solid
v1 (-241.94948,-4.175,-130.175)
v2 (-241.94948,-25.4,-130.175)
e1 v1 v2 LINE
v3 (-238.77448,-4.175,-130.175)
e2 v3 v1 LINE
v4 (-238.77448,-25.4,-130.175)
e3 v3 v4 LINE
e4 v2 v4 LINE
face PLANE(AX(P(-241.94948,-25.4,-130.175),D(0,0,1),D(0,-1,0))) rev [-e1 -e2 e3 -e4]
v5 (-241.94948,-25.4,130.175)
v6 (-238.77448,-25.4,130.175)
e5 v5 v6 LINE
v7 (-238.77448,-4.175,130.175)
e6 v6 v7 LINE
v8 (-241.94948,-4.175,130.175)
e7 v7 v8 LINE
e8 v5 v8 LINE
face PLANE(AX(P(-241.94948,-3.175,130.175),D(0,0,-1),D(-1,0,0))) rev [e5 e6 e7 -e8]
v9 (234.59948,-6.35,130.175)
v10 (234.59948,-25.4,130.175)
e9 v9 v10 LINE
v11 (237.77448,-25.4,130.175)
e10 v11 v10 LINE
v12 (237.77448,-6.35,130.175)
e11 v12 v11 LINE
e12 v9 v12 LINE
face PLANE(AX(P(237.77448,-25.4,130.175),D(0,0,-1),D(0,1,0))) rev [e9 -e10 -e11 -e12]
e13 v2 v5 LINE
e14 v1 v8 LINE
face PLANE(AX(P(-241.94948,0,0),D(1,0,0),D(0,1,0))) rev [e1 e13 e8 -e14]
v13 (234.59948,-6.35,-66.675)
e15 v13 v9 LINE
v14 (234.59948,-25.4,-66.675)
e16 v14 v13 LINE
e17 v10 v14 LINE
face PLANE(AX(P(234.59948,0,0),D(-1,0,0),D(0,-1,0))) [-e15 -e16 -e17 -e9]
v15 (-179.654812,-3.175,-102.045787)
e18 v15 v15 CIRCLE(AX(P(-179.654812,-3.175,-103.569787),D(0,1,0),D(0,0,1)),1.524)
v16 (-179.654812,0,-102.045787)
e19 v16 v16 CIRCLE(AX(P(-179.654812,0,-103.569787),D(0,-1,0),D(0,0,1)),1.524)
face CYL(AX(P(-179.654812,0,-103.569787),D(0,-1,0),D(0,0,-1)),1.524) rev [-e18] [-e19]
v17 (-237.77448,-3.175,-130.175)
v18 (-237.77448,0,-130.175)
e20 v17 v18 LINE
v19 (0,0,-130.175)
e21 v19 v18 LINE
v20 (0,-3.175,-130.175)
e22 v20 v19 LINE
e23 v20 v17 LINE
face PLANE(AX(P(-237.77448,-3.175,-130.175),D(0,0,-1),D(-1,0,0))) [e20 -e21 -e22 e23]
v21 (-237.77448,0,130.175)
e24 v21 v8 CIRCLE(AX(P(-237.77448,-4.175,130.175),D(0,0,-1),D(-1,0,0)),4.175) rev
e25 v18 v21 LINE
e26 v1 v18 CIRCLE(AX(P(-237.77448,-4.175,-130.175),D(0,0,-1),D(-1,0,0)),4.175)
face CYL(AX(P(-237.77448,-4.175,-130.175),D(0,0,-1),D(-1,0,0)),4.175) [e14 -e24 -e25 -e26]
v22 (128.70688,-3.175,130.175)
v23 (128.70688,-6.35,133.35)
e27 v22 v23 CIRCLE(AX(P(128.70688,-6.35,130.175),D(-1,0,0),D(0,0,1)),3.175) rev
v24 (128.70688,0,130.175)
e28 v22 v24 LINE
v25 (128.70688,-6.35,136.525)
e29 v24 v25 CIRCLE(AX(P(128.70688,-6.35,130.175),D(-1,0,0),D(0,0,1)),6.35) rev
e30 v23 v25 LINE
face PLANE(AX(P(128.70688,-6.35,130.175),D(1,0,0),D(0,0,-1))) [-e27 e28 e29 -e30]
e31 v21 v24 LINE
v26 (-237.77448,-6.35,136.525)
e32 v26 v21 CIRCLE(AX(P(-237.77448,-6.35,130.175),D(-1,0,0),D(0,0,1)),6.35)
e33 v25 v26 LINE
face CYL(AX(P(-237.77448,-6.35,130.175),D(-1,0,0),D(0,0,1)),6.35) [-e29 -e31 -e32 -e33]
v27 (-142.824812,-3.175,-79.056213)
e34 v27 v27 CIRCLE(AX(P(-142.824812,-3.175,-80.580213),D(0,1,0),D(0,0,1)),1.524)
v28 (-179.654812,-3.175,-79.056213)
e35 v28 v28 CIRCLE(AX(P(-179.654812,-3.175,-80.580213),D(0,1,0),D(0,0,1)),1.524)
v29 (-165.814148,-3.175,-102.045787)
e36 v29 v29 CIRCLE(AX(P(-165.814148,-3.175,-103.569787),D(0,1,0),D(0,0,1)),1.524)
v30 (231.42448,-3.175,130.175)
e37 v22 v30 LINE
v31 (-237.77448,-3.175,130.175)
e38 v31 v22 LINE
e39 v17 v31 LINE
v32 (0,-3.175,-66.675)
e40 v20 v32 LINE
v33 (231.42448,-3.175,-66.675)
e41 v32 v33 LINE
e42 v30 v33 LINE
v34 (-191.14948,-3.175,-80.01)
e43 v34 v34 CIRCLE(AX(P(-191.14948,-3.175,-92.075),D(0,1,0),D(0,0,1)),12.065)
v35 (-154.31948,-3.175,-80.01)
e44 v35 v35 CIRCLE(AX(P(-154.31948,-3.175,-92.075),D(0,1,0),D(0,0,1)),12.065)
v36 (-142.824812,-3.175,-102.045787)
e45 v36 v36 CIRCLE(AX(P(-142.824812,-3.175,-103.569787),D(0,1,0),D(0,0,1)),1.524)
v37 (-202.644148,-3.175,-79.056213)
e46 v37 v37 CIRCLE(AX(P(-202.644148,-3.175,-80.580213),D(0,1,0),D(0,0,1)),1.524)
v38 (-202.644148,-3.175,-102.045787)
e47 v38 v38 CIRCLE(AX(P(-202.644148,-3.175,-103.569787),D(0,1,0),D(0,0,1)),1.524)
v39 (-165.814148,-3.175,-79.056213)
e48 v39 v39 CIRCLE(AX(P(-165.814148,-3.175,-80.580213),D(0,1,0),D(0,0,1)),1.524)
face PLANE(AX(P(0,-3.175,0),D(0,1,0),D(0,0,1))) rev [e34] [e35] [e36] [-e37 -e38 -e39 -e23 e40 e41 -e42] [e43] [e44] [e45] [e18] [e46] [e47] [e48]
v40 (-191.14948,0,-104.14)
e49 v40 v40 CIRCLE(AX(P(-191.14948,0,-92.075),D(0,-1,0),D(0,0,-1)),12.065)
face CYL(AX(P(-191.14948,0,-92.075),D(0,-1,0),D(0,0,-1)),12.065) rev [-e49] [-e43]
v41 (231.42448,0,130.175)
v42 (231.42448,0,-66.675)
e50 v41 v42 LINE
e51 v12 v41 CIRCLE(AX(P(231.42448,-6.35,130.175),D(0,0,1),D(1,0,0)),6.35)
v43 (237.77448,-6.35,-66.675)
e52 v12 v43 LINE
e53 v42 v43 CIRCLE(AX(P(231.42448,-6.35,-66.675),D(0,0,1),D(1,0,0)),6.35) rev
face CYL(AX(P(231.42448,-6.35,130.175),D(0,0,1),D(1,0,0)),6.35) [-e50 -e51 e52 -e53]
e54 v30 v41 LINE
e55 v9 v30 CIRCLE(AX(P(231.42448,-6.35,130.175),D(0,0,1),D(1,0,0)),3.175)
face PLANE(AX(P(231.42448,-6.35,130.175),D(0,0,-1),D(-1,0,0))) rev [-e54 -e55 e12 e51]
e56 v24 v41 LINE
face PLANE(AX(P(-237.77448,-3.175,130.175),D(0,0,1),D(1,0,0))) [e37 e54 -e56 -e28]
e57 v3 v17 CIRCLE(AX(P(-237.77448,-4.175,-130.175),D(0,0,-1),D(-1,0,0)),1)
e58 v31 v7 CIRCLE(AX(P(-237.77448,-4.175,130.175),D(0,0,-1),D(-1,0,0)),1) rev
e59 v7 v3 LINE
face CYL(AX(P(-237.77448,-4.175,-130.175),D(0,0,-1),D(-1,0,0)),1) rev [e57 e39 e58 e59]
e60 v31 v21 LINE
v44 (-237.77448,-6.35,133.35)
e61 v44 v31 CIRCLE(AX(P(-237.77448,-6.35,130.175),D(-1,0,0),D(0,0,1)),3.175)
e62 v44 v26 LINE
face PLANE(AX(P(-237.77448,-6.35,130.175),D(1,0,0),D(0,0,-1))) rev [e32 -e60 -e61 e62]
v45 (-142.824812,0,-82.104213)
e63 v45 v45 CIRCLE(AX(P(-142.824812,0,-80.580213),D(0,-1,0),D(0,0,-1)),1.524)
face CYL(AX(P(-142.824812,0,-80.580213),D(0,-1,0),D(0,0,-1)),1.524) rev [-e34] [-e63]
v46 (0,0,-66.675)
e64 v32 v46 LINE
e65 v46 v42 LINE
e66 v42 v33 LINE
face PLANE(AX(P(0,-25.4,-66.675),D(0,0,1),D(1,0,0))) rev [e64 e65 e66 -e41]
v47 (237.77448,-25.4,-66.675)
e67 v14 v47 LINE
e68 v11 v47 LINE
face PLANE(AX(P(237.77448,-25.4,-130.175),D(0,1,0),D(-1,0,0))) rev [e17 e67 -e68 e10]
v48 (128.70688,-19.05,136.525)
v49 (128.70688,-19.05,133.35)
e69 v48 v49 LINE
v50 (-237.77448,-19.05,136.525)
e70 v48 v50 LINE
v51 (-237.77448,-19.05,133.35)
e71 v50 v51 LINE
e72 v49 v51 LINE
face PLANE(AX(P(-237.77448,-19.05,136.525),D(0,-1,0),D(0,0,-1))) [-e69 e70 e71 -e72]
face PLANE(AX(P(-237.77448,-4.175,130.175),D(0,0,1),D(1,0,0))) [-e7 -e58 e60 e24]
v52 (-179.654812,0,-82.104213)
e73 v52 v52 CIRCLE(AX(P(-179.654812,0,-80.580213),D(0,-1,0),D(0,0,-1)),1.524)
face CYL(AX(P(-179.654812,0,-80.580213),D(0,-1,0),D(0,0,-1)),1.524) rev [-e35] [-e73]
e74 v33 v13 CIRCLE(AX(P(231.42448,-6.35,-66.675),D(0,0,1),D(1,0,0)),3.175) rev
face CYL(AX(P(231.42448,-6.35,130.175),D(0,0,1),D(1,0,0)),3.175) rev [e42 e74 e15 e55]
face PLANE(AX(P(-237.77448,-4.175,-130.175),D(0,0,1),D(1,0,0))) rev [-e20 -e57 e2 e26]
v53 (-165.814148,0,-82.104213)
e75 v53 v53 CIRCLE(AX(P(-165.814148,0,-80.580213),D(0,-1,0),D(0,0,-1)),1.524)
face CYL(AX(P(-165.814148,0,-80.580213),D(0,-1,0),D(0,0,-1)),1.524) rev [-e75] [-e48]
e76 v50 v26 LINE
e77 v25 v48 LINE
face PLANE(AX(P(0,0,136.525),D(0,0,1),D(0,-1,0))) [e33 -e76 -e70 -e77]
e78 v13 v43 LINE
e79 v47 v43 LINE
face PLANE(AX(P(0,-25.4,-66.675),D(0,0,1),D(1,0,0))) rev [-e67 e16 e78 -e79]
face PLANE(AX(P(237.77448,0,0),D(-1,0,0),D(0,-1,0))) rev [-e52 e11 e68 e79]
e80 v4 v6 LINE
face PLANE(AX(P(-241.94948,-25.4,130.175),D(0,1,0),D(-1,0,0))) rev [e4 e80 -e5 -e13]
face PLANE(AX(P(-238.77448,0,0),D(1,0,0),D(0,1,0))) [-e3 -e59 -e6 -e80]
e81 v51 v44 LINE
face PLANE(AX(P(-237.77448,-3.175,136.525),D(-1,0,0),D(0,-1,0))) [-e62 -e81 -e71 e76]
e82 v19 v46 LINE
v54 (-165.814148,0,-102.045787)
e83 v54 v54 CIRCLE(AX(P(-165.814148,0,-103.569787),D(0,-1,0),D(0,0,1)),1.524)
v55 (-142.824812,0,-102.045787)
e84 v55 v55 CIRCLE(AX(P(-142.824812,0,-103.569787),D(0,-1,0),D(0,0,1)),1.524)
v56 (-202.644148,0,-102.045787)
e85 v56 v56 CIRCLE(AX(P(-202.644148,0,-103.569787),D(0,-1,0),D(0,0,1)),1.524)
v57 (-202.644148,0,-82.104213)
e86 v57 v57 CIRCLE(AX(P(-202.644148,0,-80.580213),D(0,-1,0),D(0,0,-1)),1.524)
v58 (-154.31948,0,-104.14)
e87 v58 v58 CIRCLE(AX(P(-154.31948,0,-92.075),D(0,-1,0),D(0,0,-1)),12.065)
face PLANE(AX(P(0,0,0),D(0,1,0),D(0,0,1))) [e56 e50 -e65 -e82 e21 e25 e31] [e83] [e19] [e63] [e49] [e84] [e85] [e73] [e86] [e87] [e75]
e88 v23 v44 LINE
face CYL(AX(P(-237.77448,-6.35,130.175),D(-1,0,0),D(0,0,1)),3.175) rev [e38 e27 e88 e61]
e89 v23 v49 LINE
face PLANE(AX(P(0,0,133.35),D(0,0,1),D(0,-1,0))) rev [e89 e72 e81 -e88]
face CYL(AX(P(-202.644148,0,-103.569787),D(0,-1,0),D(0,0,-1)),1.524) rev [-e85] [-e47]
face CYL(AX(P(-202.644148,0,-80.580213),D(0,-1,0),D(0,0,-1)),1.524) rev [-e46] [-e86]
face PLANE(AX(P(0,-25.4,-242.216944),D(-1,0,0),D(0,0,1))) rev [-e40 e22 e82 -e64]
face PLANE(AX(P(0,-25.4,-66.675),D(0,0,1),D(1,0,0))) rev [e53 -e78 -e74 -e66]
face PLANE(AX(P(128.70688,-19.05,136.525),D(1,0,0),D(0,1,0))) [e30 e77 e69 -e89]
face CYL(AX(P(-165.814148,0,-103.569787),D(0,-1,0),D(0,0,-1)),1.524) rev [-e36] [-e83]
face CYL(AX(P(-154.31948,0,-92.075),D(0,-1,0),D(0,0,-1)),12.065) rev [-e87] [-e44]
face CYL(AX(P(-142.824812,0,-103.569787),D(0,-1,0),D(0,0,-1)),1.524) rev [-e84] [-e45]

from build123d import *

# Parameters (mm, degrees)
SKETCH5_W                    = 475.54896
SKETCH5_H                    = 260.35
BASE_FLANGE1_DEPTH           = 3.175
EDGE_FLANGE1_DEPTH           = 366.48136
EDGE_FLANGE2_STRIP_W         = 19.05
EDGE_FLANGE2_STRIP_H         = 3.175
EDGE_FLANGE2_STRIP_CUT_DEPTH = 260.35
EDGE_FLANGE2_DEPTH           = 260.35
EDGE_FLANGE3_DEPTH           = 260.35
CUT_EXTRUDE1_DEPTH           = 279.969149723
CUT_EXTRUDE1_DEPTH_BACK      = 279.969149723
SKETCH15_W                   = 329.647515686
SKETCH15_H                   = 175.541944057
CUT_EXTRUDE2_DEPTH           = 279.698003441
CUT_EXTRUDE2_DEPTH_BACK      = 279.698003441
SKETCH16_R                   = 12.065
SKETCH16_R_2                 = 1.524


# Sheet-metal steps are written as plain solids
with BuildPart() as part:
    # Sketch5 → Base-Flange1 (new body)
    with BuildSketch(Plane(origin=(0, 0, 0), x_dir=(1, 0, 0), z_dir=(0, 1, 0))):
        Rectangle(SKETCH5_W, SKETCH5_H)
    extrude(amount=-BASE_FLANGE1_DEPTH)

    # Edge-Flange1 section (across the edge) → Edge-Flange1 (add)
    with BuildSketch(Plane(origin=(128.70688, -3.175, 133.35), x_dir=(0, 0, -1), z_dir=(-1, 0, 0))):
        with BuildLine():
            Line((-3.175, 3.175), (-3.175, 15.875))
            Line((-3.175, 15.875), (0, 15.875))
            Line((0, 15.875), (0, 3.175))
            ThreePointArc((0, 3.175), (0.92993597, 0.92993597), (3.175, 0))
            Line((3.175, 0), (3.175, -3.175))
            ThreePointArc((3.175, -3.175), (-1.315128061, -1.315128061), (-3.175, 3.175))
        make_face()
    extrude(amount=EDGE_FLANGE1_DEPTH)

    # Edge-Flange2 strip (across the edge) → Edge-Flange2 strip cut (cut)
    with BuildSketch(Plane(origin=(237.77448, -3.175, -130.175), x_dir=(-1, 0, 0), z_dir=(0, 0, 1))):
        with Locations((-3.175, -1.5875)):
            Rectangle(EDGE_FLANGE2_STRIP_W, EDGE_FLANGE2_STRIP_H)
    extrude(amount=EDGE_FLANGE2_STRIP_CUT_DEPTH, mode=Mode.SUBTRACT)

    # Edge-Flange2 section (across the edge) → Edge-Flange2 (add)
    with BuildSketch(Plane(origin=(237.77448, -3.175, -130.175), x_dir=(-1, 0, 0), z_dir=(0, 0, 1))):
        with BuildLine():
            Line((0, 3.175), (0, 22.225))
            Line((0, 22.225), (3.175, 22.225))
            Line((3.175, 22.225), (3.175, 3.175))
            ThreePointArc((3.175, 3.175), (4.10493597, 0.92993597), (6.35, 0))
            Line((6.35, 0), (6.35, -3.175))
            ThreePointArc((6.35, -3.175), (1.859871939, -1.315128061), (0, 3.175))
        make_face()
    extrude(amount=EDGE_FLANGE2_DEPTH)

    # Edge-Flange3 section (across the edge) → Edge-Flange3 (add)
    with BuildSketch(Plane(origin=(-238.77448, -3.175, 130.175), x_dir=(1, 0, 0), z_dir=(0, 0, -1))):
        with BuildLine():
            Line((-3.175, 1), (-3.175, 22.225))
            Line((-3.175, 22.225), (0, 22.225))
            Line((0, 22.225), (0, 1))
            ThreePointArc((0, 1), (0.292893219, 0.292893219), (1, 0))
            Line((1, 0), (1, -3.175))
            ThreePointArc((1, -3.175), (-1.952170811, -1.952170811), (-3.175, 1))
        make_face()
    extrude(amount=EDGE_FLANGE3_DEPTH)

    # Sketch15 → Cut-Extrude1 (cut, two sides: drawn at the far end of the back side and taken through both)
    with BuildSketch(Plane(origin=(0, 0, 0), x_dir=(1, 0, 0), z_dir=(0, 1, 0)).offset(-CUT_EXTRUDE1_DEPTH_BACK)):
        with Locations((164.823757843, 154.445972028)):
            Rectangle(SKETCH15_W, SKETCH15_H)
    extrude(amount=CUT_EXTRUDE1_DEPTH + CUT_EXTRUDE1_DEPTH_BACK, mode=Mode.SUBTRACT)

    # Sketch16 → Cut-Extrude2 (cut, two sides: drawn at the far end of the back side and taken through both)
    with BuildSketch(Plane.XZ.offset(3.175).offset(-CUT_EXTRUDE2_DEPTH_BACK)):
        with Locations(Location((-191.14948, -92.075, 0), (0, 0, 270))):
            Circle(SKETCH16_R)
        with Locations(Location((-179.654811625, -80.580212705, 0), (0, 0, 270))):
            Circle(SKETCH16_R_2)
        with Locations(Location((-202.644148375, -80.580212705, 0), (0, 0, 270))):
            Circle(SKETCH16_R_2)
        with Locations(Location((-179.654811625, -103.569787295, 0), (0, 0, 90))):
            Circle(SKETCH16_R_2)
        with Locations(Location((-202.644148375, -103.569787295, 0), (0, 0, 90))):
            Circle(SKETCH16_R_2)
        with Locations(Location((-165.814148375, -80.580212705, 0), (0, 0, 270))):
            Circle(SKETCH16_R_2)
        with Locations(Location((-154.31948, -92.075, 0), (0, 0, 270))):
            Circle(SKETCH16_R)
        with Locations(Location((-142.824811625, -80.580212705, 0), (0, 0, 270))):
            Circle(SKETCH16_R_2)
        with Locations(Location((-165.814148375, -103.569787295, 0), (0, 0, 90))):
            Circle(SKETCH16_R_2)
        with Locations(Location((-142.824811625, -103.569787295, 0), (0, 0, 90))):
            Circle(SKETCH16_R_2)
    extrude(amount=CUT_EXTRUDE2_DEPTH + CUT_EXTRUDE2_DEPTH_BACK, mode=Mode.SUBTRACT)


solid = part.part
